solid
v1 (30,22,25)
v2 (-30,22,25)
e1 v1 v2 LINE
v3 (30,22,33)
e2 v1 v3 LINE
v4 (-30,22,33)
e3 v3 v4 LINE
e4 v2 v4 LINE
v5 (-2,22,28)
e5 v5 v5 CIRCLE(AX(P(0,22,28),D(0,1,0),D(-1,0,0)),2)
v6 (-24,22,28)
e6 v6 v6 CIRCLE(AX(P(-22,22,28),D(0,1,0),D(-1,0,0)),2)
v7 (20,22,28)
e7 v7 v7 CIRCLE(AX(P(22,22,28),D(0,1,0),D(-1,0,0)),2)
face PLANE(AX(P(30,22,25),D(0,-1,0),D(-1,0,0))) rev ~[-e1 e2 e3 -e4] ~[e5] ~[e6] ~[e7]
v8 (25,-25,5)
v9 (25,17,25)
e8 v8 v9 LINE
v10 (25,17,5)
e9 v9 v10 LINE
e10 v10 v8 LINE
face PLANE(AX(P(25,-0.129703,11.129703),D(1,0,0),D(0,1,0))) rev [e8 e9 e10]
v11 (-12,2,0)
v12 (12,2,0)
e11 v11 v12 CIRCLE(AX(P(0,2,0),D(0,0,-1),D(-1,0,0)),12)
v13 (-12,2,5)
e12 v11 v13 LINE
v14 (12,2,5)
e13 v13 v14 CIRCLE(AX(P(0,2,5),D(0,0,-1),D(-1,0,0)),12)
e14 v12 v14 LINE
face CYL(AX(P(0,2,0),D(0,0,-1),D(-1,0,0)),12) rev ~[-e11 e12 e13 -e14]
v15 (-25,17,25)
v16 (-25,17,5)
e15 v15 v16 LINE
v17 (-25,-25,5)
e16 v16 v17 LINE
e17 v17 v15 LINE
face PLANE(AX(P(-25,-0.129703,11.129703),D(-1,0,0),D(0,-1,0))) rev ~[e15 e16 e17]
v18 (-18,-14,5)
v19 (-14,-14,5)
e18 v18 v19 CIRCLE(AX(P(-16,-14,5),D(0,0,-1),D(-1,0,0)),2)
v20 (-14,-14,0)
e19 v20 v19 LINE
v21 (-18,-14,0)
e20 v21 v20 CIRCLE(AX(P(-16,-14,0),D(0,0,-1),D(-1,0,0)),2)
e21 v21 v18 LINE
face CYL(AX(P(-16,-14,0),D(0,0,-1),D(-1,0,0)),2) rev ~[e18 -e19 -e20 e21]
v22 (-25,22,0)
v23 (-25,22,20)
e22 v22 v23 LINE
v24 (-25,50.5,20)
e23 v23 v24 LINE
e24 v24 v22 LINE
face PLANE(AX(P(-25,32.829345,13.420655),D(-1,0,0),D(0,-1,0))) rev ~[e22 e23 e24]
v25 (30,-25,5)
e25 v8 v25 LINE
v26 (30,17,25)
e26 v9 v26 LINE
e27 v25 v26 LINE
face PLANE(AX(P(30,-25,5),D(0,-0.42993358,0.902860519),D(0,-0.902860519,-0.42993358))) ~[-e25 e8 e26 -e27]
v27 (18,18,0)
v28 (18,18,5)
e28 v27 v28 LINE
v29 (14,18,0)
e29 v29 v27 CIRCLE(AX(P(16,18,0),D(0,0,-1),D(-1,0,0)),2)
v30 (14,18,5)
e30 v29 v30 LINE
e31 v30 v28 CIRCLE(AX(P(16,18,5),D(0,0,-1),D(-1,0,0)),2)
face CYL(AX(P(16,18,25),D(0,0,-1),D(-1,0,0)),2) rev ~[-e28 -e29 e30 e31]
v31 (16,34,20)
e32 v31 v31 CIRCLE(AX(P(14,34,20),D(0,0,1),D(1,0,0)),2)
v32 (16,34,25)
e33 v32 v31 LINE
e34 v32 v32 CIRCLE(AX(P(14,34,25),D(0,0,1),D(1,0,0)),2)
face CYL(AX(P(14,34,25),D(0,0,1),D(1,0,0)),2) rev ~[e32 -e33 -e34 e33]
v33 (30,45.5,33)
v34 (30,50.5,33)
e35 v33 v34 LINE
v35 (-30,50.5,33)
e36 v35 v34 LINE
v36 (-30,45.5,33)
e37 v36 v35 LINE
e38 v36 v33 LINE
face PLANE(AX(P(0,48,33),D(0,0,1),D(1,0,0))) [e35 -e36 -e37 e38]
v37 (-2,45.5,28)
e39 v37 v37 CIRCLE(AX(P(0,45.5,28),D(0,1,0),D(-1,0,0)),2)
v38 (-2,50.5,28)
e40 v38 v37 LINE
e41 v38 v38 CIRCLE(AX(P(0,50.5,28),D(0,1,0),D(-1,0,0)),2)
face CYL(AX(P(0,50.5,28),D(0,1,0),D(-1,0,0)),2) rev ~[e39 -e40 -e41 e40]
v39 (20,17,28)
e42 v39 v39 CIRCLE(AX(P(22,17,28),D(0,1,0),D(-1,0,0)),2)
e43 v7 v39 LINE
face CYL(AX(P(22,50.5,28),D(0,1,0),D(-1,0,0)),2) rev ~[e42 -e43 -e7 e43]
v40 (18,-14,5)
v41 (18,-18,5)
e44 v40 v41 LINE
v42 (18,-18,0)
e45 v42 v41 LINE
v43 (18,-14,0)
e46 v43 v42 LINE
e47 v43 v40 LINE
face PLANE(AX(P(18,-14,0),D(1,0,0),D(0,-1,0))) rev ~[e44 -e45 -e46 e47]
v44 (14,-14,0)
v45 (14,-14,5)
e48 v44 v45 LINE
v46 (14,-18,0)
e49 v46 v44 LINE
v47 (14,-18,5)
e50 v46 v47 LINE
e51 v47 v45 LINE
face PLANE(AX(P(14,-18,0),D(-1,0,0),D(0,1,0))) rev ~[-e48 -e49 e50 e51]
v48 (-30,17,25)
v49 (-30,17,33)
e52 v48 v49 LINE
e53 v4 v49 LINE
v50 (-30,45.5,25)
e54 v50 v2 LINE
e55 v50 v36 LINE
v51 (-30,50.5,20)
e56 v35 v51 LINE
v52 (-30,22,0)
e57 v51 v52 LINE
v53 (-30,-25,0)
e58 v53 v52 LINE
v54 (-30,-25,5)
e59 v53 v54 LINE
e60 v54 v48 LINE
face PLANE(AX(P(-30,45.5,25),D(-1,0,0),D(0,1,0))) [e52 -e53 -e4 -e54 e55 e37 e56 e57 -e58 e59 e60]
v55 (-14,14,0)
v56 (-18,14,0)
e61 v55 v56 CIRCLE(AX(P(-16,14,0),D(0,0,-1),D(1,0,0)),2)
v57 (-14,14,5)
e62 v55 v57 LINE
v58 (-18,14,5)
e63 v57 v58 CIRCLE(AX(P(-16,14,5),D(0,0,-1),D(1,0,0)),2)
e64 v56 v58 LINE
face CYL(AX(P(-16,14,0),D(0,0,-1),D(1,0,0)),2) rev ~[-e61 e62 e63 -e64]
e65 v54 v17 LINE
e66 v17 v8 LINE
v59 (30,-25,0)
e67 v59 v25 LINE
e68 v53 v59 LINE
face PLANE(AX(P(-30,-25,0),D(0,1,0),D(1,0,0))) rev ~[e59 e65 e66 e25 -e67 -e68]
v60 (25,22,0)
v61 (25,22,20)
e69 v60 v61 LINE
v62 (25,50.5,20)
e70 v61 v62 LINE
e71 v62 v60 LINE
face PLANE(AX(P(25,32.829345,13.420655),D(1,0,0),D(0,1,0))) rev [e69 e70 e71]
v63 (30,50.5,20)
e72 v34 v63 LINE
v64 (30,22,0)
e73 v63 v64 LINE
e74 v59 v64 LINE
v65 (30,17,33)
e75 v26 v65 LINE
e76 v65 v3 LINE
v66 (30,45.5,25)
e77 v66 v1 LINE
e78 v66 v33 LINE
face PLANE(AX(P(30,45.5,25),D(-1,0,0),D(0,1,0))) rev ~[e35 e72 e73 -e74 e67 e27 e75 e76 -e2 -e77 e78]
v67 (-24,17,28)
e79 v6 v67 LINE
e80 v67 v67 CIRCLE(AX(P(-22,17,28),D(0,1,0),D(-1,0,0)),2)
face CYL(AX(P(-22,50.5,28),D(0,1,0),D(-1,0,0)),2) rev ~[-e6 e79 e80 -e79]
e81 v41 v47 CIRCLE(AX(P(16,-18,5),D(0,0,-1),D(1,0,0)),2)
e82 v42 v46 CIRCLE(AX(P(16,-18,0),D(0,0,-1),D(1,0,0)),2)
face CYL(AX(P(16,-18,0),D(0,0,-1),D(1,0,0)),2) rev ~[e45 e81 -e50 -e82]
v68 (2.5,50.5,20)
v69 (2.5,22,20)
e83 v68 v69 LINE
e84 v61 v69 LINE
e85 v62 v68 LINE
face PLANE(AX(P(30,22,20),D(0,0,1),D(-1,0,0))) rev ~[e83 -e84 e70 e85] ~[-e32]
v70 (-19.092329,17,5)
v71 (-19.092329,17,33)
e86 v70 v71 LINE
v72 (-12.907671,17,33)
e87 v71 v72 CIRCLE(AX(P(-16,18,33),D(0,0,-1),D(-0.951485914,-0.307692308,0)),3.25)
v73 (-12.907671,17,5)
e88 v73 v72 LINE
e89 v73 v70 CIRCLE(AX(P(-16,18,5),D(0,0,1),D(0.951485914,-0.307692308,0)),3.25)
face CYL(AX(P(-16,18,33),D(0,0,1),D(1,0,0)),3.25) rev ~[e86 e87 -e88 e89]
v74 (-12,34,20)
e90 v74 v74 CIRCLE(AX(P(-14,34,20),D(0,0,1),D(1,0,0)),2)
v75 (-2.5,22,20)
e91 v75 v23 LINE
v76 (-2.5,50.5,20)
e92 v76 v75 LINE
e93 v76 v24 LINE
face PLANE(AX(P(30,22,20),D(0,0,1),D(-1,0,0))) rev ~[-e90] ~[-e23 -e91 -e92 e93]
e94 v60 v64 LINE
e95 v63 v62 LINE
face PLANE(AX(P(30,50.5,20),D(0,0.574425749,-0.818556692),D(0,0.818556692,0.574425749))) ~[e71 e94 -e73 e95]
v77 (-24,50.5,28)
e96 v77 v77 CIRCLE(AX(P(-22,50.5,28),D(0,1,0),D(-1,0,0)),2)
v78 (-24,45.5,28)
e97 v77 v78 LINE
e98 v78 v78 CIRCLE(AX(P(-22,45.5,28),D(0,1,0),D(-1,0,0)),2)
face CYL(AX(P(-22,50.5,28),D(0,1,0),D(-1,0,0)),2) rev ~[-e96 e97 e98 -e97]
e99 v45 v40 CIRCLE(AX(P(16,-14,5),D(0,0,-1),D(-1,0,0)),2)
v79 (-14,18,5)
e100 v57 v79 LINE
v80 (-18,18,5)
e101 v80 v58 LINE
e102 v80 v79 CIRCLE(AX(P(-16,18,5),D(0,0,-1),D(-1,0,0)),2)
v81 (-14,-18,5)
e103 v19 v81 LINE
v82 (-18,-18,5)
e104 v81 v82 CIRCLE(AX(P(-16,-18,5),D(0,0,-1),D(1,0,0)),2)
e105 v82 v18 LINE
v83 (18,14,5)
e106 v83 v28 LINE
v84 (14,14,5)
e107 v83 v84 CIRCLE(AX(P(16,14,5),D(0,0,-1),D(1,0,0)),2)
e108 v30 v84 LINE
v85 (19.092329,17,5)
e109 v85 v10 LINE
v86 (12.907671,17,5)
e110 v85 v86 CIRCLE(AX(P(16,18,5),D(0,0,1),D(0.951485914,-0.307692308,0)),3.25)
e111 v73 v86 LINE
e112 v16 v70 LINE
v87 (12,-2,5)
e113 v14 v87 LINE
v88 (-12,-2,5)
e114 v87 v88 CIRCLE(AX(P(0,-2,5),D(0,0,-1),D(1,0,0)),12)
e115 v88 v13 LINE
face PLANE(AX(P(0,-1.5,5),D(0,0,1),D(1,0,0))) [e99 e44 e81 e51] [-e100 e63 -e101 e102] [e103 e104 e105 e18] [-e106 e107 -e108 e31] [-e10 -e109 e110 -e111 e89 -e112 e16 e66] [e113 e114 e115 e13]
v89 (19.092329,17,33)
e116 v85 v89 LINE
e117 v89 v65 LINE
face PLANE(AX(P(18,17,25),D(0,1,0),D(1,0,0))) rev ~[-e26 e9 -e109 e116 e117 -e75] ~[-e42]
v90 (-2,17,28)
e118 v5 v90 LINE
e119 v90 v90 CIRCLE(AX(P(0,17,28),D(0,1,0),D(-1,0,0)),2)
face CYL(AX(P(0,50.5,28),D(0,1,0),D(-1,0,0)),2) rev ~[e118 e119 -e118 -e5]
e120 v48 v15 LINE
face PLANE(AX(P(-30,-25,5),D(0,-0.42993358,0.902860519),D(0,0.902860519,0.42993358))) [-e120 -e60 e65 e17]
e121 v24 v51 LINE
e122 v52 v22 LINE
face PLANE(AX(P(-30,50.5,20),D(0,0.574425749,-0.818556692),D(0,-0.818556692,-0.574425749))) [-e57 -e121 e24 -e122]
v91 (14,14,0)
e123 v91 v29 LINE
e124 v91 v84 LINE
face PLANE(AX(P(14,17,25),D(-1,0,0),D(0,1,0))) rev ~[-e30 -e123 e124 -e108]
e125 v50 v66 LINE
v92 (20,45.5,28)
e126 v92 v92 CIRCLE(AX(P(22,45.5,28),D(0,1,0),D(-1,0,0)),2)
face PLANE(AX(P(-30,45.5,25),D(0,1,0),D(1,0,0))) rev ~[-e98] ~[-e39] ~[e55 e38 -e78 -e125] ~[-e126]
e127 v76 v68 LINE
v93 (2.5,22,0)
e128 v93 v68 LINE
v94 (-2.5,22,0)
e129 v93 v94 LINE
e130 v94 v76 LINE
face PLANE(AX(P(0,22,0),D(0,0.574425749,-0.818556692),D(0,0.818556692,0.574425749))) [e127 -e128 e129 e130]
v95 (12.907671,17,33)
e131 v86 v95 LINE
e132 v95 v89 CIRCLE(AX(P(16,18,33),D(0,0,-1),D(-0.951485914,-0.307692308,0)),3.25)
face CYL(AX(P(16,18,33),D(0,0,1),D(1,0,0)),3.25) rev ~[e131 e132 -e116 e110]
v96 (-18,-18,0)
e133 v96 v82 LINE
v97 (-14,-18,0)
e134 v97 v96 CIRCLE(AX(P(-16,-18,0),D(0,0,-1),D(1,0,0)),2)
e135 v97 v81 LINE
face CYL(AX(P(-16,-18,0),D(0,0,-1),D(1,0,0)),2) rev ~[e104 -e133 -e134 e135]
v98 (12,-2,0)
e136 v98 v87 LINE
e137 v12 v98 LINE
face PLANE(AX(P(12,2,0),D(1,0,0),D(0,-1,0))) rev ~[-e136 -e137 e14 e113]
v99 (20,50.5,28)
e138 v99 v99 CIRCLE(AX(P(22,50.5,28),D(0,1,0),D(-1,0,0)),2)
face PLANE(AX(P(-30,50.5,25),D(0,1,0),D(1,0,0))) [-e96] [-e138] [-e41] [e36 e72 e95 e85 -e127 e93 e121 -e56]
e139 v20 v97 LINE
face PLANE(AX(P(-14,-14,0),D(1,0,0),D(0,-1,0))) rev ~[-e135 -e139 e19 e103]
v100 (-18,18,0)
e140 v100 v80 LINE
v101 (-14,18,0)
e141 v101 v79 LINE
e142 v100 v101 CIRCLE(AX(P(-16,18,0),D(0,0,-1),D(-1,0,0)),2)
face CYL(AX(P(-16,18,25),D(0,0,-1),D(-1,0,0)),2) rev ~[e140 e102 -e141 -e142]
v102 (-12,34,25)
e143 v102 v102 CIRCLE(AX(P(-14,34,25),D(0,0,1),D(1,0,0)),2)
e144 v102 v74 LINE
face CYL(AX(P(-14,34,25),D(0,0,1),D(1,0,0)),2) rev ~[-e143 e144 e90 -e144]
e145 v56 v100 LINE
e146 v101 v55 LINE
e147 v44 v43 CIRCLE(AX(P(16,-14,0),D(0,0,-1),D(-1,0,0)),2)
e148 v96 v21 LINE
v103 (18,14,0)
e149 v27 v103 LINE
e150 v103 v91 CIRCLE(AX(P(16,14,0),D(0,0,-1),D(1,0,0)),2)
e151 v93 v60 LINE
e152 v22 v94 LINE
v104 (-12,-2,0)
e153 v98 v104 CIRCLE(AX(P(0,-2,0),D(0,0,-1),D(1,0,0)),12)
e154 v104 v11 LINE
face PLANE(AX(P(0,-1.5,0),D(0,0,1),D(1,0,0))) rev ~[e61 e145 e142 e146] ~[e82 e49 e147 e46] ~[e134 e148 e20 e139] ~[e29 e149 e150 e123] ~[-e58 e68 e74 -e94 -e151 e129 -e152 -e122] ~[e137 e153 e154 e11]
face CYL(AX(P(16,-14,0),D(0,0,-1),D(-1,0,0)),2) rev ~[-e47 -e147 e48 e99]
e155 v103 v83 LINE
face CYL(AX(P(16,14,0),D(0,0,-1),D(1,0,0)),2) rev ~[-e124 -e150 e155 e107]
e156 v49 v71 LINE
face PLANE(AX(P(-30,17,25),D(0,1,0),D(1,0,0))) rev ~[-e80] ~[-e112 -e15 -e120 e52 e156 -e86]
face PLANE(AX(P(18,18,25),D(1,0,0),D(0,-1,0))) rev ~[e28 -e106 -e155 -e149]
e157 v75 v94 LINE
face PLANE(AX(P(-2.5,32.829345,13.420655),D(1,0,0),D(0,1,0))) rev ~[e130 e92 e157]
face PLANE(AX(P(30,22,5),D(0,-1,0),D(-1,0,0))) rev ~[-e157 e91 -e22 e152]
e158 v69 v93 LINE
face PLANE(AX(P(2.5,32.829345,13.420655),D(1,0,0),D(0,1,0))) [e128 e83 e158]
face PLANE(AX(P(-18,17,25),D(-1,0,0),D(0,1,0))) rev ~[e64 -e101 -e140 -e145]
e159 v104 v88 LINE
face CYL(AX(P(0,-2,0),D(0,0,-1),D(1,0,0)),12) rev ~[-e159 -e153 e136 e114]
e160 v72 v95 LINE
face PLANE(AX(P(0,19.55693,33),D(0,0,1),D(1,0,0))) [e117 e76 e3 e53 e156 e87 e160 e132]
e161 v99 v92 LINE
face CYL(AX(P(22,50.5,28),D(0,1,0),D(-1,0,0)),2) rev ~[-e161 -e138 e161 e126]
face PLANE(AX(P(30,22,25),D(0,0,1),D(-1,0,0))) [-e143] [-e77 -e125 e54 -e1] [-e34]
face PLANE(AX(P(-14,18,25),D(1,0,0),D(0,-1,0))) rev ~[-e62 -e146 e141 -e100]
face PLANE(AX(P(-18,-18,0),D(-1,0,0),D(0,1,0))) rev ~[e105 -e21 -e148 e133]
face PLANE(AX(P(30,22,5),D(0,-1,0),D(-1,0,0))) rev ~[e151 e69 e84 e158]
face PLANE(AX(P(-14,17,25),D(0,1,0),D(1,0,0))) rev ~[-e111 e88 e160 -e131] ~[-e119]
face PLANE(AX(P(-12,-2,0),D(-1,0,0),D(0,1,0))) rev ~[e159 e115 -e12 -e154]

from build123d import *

# Parameters (mm, degrees)
F0_W           = 60
F0_H           = 47
F1_DEPTH       = 5
F3_DEPTH       = 20
F4_W           = 60
F4_H           = 5
F5_DEPTH       = 28.5
F7_DEPTH       = 5
F9_DEPTH       = 8
F10_W          = 60
F10_H          = 5
F11_DEPTH      = 8
F12_R          = 2
F13_DEPTH      = 25
F15_DEPTH      = 2.5
F15_DEPTH_BACK = 2.5
F16_R          = 2
F17_DEPTH      = 75.501
F18_R          = 3.25
F19_DEPTH      = 28
F20_DEPTH      = 138


# Not quite as in the source:
# - an extrude ends at something that could not be found from the text; its depth is read off the source's solid
# - a pattern or mirror of a feature is missing from the dataset's text; its kind, count and spacing are read off the source's solid
# - a feature names something its author has since deleted; it is built from what else it names


with BuildPart() as f1:
    # F0 (on Top) → F1 (new body)
    with BuildSketch(Plane.XY):
        with Locations((0, -1.5)):
            Rectangle(F0_W, F0_H)
        with BuildLine():
            Line((-14, -14), (-14, -18))
            ThreePointArc((-14, -18), (-16, -20), (-18, -18))
            Line((-18, -18), (-18, -14))
            ThreePointArc((-18, -14), (-16, -12), (-14, -14))
        make_face(mode=Mode.SUBTRACT)
        with BuildLine():
            Line((18, -14), (18, -18))
            ThreePointArc((18, -18), (16, -20), (14, -18))
            Line((14, -18), (14, -14))
            ThreePointArc((14, -14), (16, -12), (18, -14))
        make_face(mode=Mode.SUBTRACT)
        with BuildLine():
            ThreePointArc((-14, 14), (-16, 12), (-18, 14))
            Line((-18, 14), (-18, 18))
            ThreePointArc((-18, 18), (-16, 20), (-14, 18))
            Line((-14, 18), (-14, 14))
        make_face(mode=Mode.SUBTRACT)
        with BuildLine():
            Line((-12, -2), (-12, 2))
            ThreePointArc((-12, 2), (0, 14), (12, 2))
            Line((12, 2), (12, -2))
            ThreePointArc((12, -2), (0, -14), (-12, -2))
        make_face(mode=Mode.SUBTRACT)
        with BuildLine():
            Line((14, 14), (14, 18))
            ThreePointArc((14, 18), (16, 20), (18, 18))
            Line((18, 18), (18, 14))
            ThreePointArc((18, 14), (16, 12), (14, 14))
        make_face(mode=Mode.SUBTRACT)
    extrude(amount=F1_DEPTH)

    # F2 (on face) → F3 (join)
    with BuildSketch(Plane.XY.offset(5)):
        with BuildLine():
            Line((30, 22), (-30, 22))
            Line((-30, 22), (-30, 17))
            Line((-30, 17), (-18, 17))
            Line((-18, 17), (-18, 18))
            ThreePointArc((-18, 18), (-16, 20), (-14, 18))
            Line((-14, 18), (-14, 17))
            Line((-14, 17), (14, 17))
            Line((14, 17), (14, 18))
            ThreePointArc((14, 18), (16, 20), (18, 18))
            Line((18, 18), (18, 17))
            Line((18, 17), (30, 17))
            Line((30, 17), (30, 22))
        make_face()
    extrude(amount=F3_DEPTH)

    # F4 (on face) → F5 (join)
    with BuildSketch(Plane(origin=(0, 22, 0), x_dir=(-1, 0, 0), z_dir=(0, 1, 0))):
        with Locations((0, 22.5)):
            Rectangle(F4_W, F4_H)
    extrude(amount=F5_DEPTH)

    # F6 (on face) → F7 (join)
    with BuildSketch(Plane(origin=(-30, 0, 0), x_dir=(0, -1, 0), z_dir=(-1, 0, 0))):
        Polygon((-22, 20), (-50.5, 20), (-22, 0), align=None)
        Polygon((25, 5), (-17, 25), (-17, 5), align=None)
    f7 = extrude(amount=-F7_DEPTH)

    # F7_copies: F7 across plane
    add(f7.mirror(Plane(origin=(0, 0, 0), x_dir=(0, 0, 1), z_dir=(1, 0, 0))))

    # F8 (on face) → F9 (join)
    with BuildSketch(Plane.XY.offset(25)):
        with BuildLine():
            Line((30, 22), (-30, 22))
            Line((-30, 22), (-30, 17))
            Line((-30, 17), (-25, 17))
            Line((-25, 17), (-18, 17))
            Line((-18, 17), (-18, 18))
            ThreePointArc((-18, 18), (-16, 20), (-14, 18))
            Line((-14, 18), (-14, 17))
            Line((-14, 17), (14, 17))
            Line((14, 17), (14, 18))
            ThreePointArc((14, 18), (16, 20), (18, 18))
            Line((18, 18), (18, 17))
            Line((18, 17), (25, 17))
            Line((25, 17), (30, 17))
            Line((30, 17), (30, 22))
        make_face()
    extrude(amount=F9_DEPTH)

    # F10 (on face) → F11 (join)
    with BuildSketch(Plane.XY.offset(25)):
        with Locations((0, 48)):
            Rectangle(F10_W, F10_H)
    extrude(amount=F11_DEPTH)

    # F12 (on face) → F13 (cut)
    with BuildSketch(Plane.XY.offset(25)):
        with Locations((14, 34)):
            Circle(F12_R)
        with Locations((-14, 34)):
            Circle(F12_R)
    extrude(amount=-F13_DEPTH, mode=Mode.SUBTRACT)

    # F14 (on Right) → F15 (join, two sides)
    with BuildSketch(Plane.YZ) as f15_sk:
        Polygon((22, 20), (22, 0), (50.5, 20), align=None)
    extrude(amount=F15_DEPTH)
    extrude(f15_sk.sketch, amount=-F15_DEPTH_BACK)

    # F16 (on face) → F17 (cut, through all)
    with BuildSketch(Plane(origin=(0, 50.5, 0), x_dir=(-1, 0, 0), z_dir=(0, 1, 0))):
        with Locations((-22, 28)):
            Circle(F16_R)
        with Locations((22, 28)):
            Circle(F16_R)
        with Locations((0, 28)):
            Circle(F16_R)
    extrude(amount=-F17_DEPTH, mode=Mode.SUBTRACT)

    # F18 (on face) → F19 (cut, through all)
    with BuildSketch(Plane.XY.offset(33)):
        with Locations((-16, 18)):
            Circle(F18_R)
        with Locations((16, 18)):
            Circle(F18_R)
    extrude(amount=-F19_DEPTH, mode=Mode.SUBTRACT)

    # F16 (on face) → F20 (cut, through all)
    with BuildSketch(Plane(origin=(0, 50.5, 0), x_dir=(-1, 0, 0), z_dir=(0, 1, 0))):
        with Locations((-22, 28)):
            Circle(F16_R)
        with Locations((22, 28)):
            Circle(F16_R)
        with Locations((0, 28)):
            Circle(F16_R)
    extrude(amount=F20_DEPTH, mode=Mode.SUBTRACT)


solid = f1.part
